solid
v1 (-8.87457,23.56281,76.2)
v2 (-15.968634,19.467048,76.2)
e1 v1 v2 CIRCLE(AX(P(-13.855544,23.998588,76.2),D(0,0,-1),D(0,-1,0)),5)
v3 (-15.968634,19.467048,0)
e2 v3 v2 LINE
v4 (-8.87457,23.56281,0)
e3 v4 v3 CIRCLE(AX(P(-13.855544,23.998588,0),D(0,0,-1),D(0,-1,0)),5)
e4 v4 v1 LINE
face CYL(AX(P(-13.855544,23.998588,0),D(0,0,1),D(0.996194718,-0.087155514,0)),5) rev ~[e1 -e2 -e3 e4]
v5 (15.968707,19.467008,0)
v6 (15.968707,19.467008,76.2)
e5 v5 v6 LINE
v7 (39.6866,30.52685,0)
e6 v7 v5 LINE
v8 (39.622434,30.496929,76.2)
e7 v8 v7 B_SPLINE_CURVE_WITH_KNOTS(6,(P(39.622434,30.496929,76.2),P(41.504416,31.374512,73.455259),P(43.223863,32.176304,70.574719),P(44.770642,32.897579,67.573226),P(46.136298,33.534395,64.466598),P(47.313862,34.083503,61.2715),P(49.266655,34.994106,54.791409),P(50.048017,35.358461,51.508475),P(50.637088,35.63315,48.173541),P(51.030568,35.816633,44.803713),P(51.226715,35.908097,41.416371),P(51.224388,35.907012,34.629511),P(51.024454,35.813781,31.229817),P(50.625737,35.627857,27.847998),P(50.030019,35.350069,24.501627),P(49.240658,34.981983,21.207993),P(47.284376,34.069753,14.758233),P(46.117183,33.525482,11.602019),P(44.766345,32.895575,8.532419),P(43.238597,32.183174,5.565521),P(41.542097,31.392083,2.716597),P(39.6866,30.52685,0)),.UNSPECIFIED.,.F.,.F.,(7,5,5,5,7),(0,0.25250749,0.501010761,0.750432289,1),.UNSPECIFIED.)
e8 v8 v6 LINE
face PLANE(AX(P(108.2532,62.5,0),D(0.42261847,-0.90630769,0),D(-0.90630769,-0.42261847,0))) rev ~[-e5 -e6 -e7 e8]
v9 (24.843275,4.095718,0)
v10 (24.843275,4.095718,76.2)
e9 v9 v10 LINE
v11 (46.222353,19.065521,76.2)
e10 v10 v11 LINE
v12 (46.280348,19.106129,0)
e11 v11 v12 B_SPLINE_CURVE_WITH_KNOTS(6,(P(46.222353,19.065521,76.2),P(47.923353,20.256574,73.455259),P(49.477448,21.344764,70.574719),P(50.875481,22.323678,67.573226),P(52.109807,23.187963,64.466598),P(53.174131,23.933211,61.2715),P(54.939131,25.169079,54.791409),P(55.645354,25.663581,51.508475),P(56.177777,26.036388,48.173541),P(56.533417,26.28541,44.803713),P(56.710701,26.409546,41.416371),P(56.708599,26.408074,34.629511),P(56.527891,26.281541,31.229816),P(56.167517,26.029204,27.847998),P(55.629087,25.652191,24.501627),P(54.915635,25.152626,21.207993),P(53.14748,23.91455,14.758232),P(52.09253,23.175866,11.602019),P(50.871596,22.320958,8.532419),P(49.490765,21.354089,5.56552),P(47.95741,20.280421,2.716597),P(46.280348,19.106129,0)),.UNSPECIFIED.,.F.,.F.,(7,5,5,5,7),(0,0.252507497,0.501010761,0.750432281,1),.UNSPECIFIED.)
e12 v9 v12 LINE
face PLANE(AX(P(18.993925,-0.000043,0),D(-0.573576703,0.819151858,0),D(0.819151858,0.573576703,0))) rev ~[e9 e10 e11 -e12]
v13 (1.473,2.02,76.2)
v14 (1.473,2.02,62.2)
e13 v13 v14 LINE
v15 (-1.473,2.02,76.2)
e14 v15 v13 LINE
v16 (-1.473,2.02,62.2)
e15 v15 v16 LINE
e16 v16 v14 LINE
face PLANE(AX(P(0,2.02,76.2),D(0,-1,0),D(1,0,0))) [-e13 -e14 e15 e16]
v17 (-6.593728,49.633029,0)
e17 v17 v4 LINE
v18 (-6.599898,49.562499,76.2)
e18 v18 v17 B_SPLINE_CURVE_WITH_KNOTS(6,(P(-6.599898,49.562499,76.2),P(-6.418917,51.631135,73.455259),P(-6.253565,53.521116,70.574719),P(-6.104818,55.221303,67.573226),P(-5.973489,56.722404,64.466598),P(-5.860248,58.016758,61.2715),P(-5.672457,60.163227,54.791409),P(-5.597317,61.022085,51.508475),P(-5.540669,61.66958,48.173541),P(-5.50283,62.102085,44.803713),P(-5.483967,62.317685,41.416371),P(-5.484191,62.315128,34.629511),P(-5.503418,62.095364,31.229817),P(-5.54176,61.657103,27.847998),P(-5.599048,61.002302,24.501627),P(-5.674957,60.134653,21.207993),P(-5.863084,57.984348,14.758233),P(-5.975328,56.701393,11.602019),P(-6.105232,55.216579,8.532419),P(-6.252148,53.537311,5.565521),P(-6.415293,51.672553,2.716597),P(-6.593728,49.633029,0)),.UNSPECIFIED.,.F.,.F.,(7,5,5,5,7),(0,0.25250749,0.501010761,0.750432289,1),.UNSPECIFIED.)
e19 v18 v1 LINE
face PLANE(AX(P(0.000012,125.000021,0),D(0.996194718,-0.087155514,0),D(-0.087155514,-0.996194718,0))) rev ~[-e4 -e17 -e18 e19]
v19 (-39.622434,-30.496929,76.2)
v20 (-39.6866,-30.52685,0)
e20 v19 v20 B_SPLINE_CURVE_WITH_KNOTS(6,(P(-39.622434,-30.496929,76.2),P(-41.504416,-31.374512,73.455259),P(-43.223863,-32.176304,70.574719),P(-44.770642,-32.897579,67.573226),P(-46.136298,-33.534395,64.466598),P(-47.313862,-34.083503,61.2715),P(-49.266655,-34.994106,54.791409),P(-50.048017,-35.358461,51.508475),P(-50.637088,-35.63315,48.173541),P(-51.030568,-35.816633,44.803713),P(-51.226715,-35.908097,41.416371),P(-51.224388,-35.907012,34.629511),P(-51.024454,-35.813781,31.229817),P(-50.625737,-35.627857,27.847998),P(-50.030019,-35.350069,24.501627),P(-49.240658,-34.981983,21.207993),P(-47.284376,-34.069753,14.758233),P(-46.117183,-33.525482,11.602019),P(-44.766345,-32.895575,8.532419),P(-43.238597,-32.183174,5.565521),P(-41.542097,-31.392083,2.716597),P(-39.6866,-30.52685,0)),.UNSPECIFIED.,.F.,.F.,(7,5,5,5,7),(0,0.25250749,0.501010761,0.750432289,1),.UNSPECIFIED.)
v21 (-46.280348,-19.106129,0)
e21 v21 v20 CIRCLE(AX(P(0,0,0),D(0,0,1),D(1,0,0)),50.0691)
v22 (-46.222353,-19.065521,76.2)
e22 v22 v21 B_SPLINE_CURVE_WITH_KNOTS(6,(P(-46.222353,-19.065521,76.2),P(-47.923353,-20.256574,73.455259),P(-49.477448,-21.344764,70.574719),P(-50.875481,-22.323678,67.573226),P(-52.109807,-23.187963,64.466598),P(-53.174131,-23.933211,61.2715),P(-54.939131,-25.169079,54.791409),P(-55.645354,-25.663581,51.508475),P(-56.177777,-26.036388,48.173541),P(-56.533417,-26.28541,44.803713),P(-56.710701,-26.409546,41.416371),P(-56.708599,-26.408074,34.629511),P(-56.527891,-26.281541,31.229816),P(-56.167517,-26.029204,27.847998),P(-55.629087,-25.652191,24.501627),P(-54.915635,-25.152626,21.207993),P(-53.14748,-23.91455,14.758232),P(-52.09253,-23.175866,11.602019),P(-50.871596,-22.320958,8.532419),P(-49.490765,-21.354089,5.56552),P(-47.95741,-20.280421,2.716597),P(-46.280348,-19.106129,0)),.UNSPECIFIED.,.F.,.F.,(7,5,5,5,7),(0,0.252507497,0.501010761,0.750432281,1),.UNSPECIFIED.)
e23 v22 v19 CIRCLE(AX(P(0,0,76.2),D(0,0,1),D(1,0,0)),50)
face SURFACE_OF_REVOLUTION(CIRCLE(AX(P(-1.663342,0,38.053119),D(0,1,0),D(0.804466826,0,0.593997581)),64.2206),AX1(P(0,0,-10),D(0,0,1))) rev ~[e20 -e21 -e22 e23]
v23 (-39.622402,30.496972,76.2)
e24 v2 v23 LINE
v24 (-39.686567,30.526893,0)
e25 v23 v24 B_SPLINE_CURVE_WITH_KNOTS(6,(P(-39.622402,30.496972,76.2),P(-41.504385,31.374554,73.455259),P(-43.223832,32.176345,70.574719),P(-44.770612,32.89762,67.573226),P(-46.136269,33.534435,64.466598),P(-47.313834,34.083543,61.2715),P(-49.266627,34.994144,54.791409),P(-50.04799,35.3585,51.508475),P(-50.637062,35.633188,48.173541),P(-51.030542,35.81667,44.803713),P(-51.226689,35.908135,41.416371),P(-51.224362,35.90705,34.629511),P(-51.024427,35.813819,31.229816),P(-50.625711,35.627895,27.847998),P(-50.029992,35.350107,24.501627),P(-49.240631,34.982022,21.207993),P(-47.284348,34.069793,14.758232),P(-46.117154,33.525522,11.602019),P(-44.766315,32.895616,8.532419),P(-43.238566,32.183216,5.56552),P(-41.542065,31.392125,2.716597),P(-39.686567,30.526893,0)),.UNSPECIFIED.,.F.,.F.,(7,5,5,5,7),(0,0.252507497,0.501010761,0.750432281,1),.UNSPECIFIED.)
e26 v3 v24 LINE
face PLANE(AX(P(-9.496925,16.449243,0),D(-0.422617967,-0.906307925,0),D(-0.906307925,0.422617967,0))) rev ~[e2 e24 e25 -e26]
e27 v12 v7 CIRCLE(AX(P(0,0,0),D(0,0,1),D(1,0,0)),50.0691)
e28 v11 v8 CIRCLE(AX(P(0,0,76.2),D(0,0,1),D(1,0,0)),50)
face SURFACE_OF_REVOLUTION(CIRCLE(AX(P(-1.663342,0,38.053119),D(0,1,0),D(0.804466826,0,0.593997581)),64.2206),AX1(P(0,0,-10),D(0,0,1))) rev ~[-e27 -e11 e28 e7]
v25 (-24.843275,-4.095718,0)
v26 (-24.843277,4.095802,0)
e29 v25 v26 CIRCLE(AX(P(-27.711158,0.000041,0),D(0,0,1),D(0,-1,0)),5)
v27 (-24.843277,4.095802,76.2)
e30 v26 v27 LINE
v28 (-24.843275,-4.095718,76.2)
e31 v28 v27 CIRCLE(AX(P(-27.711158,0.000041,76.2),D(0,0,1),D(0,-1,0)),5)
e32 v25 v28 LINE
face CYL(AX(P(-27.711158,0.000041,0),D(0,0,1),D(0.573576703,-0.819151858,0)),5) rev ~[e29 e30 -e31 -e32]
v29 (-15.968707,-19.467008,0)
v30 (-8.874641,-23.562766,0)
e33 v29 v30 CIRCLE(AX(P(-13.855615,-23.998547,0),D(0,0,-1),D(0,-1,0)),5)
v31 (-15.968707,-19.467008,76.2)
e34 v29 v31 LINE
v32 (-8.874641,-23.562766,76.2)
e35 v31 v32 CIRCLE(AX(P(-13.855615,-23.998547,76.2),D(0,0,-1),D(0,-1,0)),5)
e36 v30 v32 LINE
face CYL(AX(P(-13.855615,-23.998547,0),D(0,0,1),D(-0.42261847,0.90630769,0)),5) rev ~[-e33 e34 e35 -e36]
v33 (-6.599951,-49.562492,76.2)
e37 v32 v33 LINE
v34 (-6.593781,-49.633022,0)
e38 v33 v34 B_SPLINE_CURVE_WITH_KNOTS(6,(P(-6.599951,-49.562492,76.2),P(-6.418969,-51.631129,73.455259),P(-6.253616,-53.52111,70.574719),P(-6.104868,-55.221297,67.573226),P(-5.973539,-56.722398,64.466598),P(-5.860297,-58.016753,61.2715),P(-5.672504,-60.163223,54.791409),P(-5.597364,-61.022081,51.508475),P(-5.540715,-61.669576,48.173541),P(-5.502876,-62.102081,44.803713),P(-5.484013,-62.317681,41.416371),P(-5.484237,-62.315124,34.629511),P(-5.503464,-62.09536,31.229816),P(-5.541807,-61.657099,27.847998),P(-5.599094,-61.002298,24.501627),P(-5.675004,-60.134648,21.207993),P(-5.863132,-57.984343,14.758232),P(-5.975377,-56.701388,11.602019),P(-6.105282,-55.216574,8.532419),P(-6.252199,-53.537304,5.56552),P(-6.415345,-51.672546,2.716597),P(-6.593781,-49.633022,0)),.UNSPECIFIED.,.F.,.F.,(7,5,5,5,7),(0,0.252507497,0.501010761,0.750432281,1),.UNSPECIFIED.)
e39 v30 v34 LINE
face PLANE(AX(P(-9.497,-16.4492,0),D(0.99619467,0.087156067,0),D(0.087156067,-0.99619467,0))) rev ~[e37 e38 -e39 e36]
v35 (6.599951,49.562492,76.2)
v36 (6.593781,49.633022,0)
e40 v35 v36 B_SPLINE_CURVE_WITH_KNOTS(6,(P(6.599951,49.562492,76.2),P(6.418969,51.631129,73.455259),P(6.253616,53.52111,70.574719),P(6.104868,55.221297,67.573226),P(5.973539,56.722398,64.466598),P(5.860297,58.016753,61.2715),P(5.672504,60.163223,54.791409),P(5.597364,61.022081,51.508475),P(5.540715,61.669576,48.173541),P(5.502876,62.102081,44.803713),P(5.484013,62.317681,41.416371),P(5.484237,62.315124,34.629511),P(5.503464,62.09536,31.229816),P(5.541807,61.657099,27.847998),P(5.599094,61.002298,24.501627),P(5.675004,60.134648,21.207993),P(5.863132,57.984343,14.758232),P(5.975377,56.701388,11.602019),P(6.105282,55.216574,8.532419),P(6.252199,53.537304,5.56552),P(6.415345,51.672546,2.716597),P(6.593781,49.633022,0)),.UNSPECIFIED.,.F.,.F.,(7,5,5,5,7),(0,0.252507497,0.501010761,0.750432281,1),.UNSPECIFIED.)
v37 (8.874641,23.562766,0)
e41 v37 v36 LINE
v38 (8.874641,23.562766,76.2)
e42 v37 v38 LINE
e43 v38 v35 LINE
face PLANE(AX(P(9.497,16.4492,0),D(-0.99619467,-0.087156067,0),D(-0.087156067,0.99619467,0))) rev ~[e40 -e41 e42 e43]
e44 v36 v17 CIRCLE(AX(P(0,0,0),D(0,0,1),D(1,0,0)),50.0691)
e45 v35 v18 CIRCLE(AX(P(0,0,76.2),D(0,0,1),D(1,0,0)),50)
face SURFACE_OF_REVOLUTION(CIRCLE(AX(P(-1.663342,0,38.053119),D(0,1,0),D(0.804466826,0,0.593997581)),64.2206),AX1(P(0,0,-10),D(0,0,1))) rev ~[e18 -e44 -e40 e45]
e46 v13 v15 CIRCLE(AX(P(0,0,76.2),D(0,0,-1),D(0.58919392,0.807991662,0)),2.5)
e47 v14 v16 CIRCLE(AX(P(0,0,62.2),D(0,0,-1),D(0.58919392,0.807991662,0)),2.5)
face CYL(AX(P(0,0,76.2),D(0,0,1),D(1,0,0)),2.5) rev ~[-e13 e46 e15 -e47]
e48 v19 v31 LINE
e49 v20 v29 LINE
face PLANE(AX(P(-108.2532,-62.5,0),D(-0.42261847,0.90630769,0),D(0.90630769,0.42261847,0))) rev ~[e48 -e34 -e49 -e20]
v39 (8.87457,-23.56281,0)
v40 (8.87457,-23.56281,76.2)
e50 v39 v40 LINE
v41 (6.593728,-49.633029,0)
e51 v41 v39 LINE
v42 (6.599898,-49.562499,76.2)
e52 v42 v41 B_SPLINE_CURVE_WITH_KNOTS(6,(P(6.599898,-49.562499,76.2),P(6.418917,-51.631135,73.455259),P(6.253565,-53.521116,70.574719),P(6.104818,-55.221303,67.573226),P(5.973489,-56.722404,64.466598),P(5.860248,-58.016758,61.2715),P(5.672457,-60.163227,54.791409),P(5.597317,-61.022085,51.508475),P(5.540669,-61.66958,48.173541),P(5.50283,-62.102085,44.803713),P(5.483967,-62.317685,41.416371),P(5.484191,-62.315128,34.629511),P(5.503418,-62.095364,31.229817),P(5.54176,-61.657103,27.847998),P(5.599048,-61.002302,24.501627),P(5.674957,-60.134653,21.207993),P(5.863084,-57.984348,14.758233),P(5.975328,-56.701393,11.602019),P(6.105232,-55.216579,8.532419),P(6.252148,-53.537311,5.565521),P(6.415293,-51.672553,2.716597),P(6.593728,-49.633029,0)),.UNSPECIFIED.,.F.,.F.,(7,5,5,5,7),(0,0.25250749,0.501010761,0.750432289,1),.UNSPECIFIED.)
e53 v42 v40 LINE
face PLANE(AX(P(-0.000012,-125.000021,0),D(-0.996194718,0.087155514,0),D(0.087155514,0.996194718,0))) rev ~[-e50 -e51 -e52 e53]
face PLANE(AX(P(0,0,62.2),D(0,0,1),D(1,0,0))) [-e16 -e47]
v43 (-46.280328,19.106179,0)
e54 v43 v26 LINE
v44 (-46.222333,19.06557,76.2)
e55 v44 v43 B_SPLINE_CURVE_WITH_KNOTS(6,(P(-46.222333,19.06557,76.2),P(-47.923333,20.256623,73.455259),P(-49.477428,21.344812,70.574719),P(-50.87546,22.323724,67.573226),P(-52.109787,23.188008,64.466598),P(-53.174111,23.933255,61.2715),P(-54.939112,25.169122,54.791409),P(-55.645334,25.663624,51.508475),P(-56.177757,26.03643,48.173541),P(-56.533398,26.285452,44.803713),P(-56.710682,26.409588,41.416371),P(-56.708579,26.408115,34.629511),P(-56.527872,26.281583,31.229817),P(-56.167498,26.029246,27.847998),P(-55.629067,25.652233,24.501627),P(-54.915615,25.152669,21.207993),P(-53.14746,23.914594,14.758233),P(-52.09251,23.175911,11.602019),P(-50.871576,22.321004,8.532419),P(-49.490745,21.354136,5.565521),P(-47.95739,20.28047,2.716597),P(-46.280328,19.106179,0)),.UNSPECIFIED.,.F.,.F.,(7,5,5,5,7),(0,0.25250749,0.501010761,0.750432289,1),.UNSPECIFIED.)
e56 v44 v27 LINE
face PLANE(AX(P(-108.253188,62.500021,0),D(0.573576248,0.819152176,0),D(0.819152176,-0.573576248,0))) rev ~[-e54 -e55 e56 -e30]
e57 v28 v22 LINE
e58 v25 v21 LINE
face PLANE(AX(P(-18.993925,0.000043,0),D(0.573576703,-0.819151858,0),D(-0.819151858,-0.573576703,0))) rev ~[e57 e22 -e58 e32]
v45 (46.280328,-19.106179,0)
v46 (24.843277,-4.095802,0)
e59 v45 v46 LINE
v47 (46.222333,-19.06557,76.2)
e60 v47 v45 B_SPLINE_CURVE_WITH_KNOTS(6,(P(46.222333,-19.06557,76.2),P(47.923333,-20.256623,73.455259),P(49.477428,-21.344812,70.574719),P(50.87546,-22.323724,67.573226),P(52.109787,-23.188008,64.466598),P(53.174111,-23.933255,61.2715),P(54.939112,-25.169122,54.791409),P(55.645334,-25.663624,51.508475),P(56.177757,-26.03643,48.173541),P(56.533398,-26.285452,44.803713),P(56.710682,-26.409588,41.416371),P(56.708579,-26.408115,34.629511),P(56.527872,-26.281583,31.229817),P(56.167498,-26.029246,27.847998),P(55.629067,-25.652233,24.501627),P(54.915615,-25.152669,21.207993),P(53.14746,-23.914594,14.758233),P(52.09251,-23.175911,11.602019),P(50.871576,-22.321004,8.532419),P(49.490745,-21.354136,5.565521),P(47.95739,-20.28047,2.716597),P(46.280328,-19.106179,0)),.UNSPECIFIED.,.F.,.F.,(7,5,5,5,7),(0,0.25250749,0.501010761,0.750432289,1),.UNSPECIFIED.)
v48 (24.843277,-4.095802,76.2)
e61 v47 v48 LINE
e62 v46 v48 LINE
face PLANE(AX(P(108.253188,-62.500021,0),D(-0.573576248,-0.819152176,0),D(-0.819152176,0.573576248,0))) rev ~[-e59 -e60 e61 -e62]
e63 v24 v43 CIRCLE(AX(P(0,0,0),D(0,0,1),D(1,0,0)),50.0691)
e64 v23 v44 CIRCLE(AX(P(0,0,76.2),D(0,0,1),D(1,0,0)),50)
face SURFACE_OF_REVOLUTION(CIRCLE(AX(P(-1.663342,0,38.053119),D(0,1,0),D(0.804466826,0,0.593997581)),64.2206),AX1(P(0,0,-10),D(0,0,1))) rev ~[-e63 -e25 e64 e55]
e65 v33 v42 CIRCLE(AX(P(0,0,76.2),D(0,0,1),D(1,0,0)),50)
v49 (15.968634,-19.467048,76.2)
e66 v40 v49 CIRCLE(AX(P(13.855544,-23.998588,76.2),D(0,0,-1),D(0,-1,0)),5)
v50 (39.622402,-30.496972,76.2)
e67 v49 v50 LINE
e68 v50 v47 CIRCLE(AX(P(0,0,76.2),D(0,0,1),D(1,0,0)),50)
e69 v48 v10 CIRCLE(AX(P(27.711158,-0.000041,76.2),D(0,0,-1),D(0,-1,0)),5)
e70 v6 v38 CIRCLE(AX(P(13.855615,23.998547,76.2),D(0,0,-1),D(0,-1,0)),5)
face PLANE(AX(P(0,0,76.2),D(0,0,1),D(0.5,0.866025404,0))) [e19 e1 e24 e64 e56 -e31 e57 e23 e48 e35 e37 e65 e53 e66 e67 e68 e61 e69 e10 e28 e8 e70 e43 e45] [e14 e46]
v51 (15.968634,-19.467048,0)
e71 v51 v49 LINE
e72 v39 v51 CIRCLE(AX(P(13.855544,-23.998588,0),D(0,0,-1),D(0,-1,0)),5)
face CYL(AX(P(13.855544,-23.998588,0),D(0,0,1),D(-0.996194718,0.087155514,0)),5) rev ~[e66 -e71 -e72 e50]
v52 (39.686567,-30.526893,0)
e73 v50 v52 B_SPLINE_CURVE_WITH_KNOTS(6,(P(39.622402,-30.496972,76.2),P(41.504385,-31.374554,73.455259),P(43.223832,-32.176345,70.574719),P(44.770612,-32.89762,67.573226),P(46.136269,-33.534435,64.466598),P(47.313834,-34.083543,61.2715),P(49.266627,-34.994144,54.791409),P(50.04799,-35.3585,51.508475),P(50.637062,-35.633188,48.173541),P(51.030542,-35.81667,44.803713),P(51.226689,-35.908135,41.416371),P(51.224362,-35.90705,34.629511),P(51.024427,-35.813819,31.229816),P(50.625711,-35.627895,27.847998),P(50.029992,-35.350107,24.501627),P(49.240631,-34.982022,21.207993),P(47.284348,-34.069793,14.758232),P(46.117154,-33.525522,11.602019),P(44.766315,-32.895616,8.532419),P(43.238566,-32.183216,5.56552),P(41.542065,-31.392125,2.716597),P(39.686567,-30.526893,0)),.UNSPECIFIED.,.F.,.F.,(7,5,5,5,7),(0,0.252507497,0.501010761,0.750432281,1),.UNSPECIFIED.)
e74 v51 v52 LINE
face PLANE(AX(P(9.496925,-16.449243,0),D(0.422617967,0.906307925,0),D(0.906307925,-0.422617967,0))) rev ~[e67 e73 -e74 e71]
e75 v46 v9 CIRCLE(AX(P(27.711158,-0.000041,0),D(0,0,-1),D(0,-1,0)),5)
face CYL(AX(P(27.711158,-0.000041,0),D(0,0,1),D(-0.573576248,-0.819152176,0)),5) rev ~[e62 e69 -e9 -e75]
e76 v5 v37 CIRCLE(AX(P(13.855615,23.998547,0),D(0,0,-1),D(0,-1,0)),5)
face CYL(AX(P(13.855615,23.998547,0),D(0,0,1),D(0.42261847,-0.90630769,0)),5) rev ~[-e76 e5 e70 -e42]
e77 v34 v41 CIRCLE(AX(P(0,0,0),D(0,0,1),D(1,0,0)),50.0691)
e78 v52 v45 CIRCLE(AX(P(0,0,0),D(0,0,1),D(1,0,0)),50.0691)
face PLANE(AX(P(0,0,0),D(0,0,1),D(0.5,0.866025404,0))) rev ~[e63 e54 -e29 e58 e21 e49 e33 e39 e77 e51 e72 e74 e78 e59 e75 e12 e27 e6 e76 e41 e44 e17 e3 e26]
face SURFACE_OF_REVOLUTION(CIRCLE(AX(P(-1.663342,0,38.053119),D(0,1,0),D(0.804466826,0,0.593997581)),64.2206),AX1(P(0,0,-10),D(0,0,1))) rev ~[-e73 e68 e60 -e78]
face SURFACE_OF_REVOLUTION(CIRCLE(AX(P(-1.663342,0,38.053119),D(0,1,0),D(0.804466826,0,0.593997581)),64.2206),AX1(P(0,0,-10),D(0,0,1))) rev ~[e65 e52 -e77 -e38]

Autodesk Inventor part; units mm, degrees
ref_plane "YZ Plane" through (0, 0, 0) normal (1, 0, 0) x (0, 1, 0)
ref_plane "XZ Plane" through (0, 0, 0) normal (0, 1, 0) x (-1, 0, 0)
ref_plane "XY Plane" through (0, 0, 0) normal (0, 0, 1) x (1, 0, 0)
sketch "Sketch6" plane through (0, 0, 0) normal (0, 0, 1) x (1, 0, 0)
  circle A0 centre (0, 0) radius 2.75
  line L0 (0, 0) -> (0, 125)
  line L1 (0, 0) -> (108.2532, 62.5)
  line L2 (0, 0) -> (125, 0) construction
  line L3 (0, 0) -> (18.8687, 32.6815)
  line L4 (0, 0) -> (37.7374, 0) construction
  line L5 (108.2532, 62.5) -> (9.497, 16.4492)
  line L6 (108.2532, 62.5) -> (217.2186, 62.5) construction
  line L7 (9.497, 16.4492) -> (0, 125)
  line L8 (0, 125) -> (-9.497, 16.4492)
  line L9 (-9.497, 16.4492) -> (-108.2532, 62.5)
  line L10 (-108.2532, 62.5) -> (-18.9939, 0)
  line L11 (-18.9939, 0) -> (-108.2532, -62.5)
  line L12 (-108.2532, -62.5) -> (-9.497, -16.4492)
  line L13 (-9.497, -16.4492) -> (0, -125)
  line L14 (0, -125) -> (9.497, -16.4492)
  line L15 (9.497, -16.4492) -> (108.2532, -62.5)
  line L16 (108.2532, -62.5) -> (18.9939, 0)
  line L17 (18.9939, 0) -> (108.2532, 62.5)
  dimension "d21" = 5.5
  dimension "d22" = 125
  dimension "d23" = 30
  dimension "d24" = 60
  dimension "d25" = 155
  dimension "d28" = 360
extrude "Extrusion2" add sketch "Sketch6" along normal blind 76.2 contours L1 L3 A0 | A0 L3 L5 L1 | L0 L7 L3 A0 | A0 L3 L0
sketch "Sketch4" plane through (0, 0, 0) normal (0, 1, 0) x (-1, 0, 0)
  line L0 (-125.0691, 0) -> (-125.0691, 76.2)
  line L1 (0, -15.24) -> (0, 91.44) projected
  line L2 (-50.0691, 0) -> (-0.0691, 0)
  line L3 (-50, 76.2) -> (0, 76.2)
  line L4 (0, 76.2) -> (-125.0691, 76.2)
  line L5 (0, 0) -> (-108.2532, 0) projected
  line L6 (-125.0691, 0) -> (0, 0)
  arc A0 (-50, 76.2) -> (-50.0691, 0) centre (1.6634, 38.0531) ccw
  point P0 (-25, 76.2)
  point P1 (-0.0691, 76.2)
  point P2 (-62.5691, 76.2)
  dimension "d7" = 125
  dimension "d36" = 50
  dimension "d37" = 50
pattern_circular "Circular Pattern1" count 6 over 360 about axis through (0, 0, -10) along (0, 0, 1) of "Extrusion2"
revolve "Revolution2" cut sketch "Sketch4" angle 360 about axis through (0, 0, -10) along (0, 0, 1) contours L0 L4 A0 L5 L6
fillet "Fillet1" radius 5 1 edges at (-18.9939, 0, 38.1)
pattern_circular "Circular Pattern2" count 6 over 360 about axis through (0, 0, -10) along (0, 0, 1) of "Fillet1"
sketch "Sketch9" plane through (0, 0, 76.2) normal (0, 0, 1) x (1, 0, 0)
  circle A0 centre (0, 0) radius 2.5
  line L0 (0, 2.5) -> (0, 2.02)
  line L1 (0, 2.02) -> (-1.473, 2.02)
  line L2 (0, 2.02) -> (1.473, 2.02)
  dimension "d42" = 5
  dimension "d43" = 0.48
extrude "Extrusion3" cut sketch "Sketch9" against normal blind 14 contours A0 L1 L2
sketch "Sketch10" plane through (0, 0, 76.2) normal (0, 0, 1) x (1, 0, 0)
  point P0 (0, 0)
properties part number "Dispensing Gear V2"
